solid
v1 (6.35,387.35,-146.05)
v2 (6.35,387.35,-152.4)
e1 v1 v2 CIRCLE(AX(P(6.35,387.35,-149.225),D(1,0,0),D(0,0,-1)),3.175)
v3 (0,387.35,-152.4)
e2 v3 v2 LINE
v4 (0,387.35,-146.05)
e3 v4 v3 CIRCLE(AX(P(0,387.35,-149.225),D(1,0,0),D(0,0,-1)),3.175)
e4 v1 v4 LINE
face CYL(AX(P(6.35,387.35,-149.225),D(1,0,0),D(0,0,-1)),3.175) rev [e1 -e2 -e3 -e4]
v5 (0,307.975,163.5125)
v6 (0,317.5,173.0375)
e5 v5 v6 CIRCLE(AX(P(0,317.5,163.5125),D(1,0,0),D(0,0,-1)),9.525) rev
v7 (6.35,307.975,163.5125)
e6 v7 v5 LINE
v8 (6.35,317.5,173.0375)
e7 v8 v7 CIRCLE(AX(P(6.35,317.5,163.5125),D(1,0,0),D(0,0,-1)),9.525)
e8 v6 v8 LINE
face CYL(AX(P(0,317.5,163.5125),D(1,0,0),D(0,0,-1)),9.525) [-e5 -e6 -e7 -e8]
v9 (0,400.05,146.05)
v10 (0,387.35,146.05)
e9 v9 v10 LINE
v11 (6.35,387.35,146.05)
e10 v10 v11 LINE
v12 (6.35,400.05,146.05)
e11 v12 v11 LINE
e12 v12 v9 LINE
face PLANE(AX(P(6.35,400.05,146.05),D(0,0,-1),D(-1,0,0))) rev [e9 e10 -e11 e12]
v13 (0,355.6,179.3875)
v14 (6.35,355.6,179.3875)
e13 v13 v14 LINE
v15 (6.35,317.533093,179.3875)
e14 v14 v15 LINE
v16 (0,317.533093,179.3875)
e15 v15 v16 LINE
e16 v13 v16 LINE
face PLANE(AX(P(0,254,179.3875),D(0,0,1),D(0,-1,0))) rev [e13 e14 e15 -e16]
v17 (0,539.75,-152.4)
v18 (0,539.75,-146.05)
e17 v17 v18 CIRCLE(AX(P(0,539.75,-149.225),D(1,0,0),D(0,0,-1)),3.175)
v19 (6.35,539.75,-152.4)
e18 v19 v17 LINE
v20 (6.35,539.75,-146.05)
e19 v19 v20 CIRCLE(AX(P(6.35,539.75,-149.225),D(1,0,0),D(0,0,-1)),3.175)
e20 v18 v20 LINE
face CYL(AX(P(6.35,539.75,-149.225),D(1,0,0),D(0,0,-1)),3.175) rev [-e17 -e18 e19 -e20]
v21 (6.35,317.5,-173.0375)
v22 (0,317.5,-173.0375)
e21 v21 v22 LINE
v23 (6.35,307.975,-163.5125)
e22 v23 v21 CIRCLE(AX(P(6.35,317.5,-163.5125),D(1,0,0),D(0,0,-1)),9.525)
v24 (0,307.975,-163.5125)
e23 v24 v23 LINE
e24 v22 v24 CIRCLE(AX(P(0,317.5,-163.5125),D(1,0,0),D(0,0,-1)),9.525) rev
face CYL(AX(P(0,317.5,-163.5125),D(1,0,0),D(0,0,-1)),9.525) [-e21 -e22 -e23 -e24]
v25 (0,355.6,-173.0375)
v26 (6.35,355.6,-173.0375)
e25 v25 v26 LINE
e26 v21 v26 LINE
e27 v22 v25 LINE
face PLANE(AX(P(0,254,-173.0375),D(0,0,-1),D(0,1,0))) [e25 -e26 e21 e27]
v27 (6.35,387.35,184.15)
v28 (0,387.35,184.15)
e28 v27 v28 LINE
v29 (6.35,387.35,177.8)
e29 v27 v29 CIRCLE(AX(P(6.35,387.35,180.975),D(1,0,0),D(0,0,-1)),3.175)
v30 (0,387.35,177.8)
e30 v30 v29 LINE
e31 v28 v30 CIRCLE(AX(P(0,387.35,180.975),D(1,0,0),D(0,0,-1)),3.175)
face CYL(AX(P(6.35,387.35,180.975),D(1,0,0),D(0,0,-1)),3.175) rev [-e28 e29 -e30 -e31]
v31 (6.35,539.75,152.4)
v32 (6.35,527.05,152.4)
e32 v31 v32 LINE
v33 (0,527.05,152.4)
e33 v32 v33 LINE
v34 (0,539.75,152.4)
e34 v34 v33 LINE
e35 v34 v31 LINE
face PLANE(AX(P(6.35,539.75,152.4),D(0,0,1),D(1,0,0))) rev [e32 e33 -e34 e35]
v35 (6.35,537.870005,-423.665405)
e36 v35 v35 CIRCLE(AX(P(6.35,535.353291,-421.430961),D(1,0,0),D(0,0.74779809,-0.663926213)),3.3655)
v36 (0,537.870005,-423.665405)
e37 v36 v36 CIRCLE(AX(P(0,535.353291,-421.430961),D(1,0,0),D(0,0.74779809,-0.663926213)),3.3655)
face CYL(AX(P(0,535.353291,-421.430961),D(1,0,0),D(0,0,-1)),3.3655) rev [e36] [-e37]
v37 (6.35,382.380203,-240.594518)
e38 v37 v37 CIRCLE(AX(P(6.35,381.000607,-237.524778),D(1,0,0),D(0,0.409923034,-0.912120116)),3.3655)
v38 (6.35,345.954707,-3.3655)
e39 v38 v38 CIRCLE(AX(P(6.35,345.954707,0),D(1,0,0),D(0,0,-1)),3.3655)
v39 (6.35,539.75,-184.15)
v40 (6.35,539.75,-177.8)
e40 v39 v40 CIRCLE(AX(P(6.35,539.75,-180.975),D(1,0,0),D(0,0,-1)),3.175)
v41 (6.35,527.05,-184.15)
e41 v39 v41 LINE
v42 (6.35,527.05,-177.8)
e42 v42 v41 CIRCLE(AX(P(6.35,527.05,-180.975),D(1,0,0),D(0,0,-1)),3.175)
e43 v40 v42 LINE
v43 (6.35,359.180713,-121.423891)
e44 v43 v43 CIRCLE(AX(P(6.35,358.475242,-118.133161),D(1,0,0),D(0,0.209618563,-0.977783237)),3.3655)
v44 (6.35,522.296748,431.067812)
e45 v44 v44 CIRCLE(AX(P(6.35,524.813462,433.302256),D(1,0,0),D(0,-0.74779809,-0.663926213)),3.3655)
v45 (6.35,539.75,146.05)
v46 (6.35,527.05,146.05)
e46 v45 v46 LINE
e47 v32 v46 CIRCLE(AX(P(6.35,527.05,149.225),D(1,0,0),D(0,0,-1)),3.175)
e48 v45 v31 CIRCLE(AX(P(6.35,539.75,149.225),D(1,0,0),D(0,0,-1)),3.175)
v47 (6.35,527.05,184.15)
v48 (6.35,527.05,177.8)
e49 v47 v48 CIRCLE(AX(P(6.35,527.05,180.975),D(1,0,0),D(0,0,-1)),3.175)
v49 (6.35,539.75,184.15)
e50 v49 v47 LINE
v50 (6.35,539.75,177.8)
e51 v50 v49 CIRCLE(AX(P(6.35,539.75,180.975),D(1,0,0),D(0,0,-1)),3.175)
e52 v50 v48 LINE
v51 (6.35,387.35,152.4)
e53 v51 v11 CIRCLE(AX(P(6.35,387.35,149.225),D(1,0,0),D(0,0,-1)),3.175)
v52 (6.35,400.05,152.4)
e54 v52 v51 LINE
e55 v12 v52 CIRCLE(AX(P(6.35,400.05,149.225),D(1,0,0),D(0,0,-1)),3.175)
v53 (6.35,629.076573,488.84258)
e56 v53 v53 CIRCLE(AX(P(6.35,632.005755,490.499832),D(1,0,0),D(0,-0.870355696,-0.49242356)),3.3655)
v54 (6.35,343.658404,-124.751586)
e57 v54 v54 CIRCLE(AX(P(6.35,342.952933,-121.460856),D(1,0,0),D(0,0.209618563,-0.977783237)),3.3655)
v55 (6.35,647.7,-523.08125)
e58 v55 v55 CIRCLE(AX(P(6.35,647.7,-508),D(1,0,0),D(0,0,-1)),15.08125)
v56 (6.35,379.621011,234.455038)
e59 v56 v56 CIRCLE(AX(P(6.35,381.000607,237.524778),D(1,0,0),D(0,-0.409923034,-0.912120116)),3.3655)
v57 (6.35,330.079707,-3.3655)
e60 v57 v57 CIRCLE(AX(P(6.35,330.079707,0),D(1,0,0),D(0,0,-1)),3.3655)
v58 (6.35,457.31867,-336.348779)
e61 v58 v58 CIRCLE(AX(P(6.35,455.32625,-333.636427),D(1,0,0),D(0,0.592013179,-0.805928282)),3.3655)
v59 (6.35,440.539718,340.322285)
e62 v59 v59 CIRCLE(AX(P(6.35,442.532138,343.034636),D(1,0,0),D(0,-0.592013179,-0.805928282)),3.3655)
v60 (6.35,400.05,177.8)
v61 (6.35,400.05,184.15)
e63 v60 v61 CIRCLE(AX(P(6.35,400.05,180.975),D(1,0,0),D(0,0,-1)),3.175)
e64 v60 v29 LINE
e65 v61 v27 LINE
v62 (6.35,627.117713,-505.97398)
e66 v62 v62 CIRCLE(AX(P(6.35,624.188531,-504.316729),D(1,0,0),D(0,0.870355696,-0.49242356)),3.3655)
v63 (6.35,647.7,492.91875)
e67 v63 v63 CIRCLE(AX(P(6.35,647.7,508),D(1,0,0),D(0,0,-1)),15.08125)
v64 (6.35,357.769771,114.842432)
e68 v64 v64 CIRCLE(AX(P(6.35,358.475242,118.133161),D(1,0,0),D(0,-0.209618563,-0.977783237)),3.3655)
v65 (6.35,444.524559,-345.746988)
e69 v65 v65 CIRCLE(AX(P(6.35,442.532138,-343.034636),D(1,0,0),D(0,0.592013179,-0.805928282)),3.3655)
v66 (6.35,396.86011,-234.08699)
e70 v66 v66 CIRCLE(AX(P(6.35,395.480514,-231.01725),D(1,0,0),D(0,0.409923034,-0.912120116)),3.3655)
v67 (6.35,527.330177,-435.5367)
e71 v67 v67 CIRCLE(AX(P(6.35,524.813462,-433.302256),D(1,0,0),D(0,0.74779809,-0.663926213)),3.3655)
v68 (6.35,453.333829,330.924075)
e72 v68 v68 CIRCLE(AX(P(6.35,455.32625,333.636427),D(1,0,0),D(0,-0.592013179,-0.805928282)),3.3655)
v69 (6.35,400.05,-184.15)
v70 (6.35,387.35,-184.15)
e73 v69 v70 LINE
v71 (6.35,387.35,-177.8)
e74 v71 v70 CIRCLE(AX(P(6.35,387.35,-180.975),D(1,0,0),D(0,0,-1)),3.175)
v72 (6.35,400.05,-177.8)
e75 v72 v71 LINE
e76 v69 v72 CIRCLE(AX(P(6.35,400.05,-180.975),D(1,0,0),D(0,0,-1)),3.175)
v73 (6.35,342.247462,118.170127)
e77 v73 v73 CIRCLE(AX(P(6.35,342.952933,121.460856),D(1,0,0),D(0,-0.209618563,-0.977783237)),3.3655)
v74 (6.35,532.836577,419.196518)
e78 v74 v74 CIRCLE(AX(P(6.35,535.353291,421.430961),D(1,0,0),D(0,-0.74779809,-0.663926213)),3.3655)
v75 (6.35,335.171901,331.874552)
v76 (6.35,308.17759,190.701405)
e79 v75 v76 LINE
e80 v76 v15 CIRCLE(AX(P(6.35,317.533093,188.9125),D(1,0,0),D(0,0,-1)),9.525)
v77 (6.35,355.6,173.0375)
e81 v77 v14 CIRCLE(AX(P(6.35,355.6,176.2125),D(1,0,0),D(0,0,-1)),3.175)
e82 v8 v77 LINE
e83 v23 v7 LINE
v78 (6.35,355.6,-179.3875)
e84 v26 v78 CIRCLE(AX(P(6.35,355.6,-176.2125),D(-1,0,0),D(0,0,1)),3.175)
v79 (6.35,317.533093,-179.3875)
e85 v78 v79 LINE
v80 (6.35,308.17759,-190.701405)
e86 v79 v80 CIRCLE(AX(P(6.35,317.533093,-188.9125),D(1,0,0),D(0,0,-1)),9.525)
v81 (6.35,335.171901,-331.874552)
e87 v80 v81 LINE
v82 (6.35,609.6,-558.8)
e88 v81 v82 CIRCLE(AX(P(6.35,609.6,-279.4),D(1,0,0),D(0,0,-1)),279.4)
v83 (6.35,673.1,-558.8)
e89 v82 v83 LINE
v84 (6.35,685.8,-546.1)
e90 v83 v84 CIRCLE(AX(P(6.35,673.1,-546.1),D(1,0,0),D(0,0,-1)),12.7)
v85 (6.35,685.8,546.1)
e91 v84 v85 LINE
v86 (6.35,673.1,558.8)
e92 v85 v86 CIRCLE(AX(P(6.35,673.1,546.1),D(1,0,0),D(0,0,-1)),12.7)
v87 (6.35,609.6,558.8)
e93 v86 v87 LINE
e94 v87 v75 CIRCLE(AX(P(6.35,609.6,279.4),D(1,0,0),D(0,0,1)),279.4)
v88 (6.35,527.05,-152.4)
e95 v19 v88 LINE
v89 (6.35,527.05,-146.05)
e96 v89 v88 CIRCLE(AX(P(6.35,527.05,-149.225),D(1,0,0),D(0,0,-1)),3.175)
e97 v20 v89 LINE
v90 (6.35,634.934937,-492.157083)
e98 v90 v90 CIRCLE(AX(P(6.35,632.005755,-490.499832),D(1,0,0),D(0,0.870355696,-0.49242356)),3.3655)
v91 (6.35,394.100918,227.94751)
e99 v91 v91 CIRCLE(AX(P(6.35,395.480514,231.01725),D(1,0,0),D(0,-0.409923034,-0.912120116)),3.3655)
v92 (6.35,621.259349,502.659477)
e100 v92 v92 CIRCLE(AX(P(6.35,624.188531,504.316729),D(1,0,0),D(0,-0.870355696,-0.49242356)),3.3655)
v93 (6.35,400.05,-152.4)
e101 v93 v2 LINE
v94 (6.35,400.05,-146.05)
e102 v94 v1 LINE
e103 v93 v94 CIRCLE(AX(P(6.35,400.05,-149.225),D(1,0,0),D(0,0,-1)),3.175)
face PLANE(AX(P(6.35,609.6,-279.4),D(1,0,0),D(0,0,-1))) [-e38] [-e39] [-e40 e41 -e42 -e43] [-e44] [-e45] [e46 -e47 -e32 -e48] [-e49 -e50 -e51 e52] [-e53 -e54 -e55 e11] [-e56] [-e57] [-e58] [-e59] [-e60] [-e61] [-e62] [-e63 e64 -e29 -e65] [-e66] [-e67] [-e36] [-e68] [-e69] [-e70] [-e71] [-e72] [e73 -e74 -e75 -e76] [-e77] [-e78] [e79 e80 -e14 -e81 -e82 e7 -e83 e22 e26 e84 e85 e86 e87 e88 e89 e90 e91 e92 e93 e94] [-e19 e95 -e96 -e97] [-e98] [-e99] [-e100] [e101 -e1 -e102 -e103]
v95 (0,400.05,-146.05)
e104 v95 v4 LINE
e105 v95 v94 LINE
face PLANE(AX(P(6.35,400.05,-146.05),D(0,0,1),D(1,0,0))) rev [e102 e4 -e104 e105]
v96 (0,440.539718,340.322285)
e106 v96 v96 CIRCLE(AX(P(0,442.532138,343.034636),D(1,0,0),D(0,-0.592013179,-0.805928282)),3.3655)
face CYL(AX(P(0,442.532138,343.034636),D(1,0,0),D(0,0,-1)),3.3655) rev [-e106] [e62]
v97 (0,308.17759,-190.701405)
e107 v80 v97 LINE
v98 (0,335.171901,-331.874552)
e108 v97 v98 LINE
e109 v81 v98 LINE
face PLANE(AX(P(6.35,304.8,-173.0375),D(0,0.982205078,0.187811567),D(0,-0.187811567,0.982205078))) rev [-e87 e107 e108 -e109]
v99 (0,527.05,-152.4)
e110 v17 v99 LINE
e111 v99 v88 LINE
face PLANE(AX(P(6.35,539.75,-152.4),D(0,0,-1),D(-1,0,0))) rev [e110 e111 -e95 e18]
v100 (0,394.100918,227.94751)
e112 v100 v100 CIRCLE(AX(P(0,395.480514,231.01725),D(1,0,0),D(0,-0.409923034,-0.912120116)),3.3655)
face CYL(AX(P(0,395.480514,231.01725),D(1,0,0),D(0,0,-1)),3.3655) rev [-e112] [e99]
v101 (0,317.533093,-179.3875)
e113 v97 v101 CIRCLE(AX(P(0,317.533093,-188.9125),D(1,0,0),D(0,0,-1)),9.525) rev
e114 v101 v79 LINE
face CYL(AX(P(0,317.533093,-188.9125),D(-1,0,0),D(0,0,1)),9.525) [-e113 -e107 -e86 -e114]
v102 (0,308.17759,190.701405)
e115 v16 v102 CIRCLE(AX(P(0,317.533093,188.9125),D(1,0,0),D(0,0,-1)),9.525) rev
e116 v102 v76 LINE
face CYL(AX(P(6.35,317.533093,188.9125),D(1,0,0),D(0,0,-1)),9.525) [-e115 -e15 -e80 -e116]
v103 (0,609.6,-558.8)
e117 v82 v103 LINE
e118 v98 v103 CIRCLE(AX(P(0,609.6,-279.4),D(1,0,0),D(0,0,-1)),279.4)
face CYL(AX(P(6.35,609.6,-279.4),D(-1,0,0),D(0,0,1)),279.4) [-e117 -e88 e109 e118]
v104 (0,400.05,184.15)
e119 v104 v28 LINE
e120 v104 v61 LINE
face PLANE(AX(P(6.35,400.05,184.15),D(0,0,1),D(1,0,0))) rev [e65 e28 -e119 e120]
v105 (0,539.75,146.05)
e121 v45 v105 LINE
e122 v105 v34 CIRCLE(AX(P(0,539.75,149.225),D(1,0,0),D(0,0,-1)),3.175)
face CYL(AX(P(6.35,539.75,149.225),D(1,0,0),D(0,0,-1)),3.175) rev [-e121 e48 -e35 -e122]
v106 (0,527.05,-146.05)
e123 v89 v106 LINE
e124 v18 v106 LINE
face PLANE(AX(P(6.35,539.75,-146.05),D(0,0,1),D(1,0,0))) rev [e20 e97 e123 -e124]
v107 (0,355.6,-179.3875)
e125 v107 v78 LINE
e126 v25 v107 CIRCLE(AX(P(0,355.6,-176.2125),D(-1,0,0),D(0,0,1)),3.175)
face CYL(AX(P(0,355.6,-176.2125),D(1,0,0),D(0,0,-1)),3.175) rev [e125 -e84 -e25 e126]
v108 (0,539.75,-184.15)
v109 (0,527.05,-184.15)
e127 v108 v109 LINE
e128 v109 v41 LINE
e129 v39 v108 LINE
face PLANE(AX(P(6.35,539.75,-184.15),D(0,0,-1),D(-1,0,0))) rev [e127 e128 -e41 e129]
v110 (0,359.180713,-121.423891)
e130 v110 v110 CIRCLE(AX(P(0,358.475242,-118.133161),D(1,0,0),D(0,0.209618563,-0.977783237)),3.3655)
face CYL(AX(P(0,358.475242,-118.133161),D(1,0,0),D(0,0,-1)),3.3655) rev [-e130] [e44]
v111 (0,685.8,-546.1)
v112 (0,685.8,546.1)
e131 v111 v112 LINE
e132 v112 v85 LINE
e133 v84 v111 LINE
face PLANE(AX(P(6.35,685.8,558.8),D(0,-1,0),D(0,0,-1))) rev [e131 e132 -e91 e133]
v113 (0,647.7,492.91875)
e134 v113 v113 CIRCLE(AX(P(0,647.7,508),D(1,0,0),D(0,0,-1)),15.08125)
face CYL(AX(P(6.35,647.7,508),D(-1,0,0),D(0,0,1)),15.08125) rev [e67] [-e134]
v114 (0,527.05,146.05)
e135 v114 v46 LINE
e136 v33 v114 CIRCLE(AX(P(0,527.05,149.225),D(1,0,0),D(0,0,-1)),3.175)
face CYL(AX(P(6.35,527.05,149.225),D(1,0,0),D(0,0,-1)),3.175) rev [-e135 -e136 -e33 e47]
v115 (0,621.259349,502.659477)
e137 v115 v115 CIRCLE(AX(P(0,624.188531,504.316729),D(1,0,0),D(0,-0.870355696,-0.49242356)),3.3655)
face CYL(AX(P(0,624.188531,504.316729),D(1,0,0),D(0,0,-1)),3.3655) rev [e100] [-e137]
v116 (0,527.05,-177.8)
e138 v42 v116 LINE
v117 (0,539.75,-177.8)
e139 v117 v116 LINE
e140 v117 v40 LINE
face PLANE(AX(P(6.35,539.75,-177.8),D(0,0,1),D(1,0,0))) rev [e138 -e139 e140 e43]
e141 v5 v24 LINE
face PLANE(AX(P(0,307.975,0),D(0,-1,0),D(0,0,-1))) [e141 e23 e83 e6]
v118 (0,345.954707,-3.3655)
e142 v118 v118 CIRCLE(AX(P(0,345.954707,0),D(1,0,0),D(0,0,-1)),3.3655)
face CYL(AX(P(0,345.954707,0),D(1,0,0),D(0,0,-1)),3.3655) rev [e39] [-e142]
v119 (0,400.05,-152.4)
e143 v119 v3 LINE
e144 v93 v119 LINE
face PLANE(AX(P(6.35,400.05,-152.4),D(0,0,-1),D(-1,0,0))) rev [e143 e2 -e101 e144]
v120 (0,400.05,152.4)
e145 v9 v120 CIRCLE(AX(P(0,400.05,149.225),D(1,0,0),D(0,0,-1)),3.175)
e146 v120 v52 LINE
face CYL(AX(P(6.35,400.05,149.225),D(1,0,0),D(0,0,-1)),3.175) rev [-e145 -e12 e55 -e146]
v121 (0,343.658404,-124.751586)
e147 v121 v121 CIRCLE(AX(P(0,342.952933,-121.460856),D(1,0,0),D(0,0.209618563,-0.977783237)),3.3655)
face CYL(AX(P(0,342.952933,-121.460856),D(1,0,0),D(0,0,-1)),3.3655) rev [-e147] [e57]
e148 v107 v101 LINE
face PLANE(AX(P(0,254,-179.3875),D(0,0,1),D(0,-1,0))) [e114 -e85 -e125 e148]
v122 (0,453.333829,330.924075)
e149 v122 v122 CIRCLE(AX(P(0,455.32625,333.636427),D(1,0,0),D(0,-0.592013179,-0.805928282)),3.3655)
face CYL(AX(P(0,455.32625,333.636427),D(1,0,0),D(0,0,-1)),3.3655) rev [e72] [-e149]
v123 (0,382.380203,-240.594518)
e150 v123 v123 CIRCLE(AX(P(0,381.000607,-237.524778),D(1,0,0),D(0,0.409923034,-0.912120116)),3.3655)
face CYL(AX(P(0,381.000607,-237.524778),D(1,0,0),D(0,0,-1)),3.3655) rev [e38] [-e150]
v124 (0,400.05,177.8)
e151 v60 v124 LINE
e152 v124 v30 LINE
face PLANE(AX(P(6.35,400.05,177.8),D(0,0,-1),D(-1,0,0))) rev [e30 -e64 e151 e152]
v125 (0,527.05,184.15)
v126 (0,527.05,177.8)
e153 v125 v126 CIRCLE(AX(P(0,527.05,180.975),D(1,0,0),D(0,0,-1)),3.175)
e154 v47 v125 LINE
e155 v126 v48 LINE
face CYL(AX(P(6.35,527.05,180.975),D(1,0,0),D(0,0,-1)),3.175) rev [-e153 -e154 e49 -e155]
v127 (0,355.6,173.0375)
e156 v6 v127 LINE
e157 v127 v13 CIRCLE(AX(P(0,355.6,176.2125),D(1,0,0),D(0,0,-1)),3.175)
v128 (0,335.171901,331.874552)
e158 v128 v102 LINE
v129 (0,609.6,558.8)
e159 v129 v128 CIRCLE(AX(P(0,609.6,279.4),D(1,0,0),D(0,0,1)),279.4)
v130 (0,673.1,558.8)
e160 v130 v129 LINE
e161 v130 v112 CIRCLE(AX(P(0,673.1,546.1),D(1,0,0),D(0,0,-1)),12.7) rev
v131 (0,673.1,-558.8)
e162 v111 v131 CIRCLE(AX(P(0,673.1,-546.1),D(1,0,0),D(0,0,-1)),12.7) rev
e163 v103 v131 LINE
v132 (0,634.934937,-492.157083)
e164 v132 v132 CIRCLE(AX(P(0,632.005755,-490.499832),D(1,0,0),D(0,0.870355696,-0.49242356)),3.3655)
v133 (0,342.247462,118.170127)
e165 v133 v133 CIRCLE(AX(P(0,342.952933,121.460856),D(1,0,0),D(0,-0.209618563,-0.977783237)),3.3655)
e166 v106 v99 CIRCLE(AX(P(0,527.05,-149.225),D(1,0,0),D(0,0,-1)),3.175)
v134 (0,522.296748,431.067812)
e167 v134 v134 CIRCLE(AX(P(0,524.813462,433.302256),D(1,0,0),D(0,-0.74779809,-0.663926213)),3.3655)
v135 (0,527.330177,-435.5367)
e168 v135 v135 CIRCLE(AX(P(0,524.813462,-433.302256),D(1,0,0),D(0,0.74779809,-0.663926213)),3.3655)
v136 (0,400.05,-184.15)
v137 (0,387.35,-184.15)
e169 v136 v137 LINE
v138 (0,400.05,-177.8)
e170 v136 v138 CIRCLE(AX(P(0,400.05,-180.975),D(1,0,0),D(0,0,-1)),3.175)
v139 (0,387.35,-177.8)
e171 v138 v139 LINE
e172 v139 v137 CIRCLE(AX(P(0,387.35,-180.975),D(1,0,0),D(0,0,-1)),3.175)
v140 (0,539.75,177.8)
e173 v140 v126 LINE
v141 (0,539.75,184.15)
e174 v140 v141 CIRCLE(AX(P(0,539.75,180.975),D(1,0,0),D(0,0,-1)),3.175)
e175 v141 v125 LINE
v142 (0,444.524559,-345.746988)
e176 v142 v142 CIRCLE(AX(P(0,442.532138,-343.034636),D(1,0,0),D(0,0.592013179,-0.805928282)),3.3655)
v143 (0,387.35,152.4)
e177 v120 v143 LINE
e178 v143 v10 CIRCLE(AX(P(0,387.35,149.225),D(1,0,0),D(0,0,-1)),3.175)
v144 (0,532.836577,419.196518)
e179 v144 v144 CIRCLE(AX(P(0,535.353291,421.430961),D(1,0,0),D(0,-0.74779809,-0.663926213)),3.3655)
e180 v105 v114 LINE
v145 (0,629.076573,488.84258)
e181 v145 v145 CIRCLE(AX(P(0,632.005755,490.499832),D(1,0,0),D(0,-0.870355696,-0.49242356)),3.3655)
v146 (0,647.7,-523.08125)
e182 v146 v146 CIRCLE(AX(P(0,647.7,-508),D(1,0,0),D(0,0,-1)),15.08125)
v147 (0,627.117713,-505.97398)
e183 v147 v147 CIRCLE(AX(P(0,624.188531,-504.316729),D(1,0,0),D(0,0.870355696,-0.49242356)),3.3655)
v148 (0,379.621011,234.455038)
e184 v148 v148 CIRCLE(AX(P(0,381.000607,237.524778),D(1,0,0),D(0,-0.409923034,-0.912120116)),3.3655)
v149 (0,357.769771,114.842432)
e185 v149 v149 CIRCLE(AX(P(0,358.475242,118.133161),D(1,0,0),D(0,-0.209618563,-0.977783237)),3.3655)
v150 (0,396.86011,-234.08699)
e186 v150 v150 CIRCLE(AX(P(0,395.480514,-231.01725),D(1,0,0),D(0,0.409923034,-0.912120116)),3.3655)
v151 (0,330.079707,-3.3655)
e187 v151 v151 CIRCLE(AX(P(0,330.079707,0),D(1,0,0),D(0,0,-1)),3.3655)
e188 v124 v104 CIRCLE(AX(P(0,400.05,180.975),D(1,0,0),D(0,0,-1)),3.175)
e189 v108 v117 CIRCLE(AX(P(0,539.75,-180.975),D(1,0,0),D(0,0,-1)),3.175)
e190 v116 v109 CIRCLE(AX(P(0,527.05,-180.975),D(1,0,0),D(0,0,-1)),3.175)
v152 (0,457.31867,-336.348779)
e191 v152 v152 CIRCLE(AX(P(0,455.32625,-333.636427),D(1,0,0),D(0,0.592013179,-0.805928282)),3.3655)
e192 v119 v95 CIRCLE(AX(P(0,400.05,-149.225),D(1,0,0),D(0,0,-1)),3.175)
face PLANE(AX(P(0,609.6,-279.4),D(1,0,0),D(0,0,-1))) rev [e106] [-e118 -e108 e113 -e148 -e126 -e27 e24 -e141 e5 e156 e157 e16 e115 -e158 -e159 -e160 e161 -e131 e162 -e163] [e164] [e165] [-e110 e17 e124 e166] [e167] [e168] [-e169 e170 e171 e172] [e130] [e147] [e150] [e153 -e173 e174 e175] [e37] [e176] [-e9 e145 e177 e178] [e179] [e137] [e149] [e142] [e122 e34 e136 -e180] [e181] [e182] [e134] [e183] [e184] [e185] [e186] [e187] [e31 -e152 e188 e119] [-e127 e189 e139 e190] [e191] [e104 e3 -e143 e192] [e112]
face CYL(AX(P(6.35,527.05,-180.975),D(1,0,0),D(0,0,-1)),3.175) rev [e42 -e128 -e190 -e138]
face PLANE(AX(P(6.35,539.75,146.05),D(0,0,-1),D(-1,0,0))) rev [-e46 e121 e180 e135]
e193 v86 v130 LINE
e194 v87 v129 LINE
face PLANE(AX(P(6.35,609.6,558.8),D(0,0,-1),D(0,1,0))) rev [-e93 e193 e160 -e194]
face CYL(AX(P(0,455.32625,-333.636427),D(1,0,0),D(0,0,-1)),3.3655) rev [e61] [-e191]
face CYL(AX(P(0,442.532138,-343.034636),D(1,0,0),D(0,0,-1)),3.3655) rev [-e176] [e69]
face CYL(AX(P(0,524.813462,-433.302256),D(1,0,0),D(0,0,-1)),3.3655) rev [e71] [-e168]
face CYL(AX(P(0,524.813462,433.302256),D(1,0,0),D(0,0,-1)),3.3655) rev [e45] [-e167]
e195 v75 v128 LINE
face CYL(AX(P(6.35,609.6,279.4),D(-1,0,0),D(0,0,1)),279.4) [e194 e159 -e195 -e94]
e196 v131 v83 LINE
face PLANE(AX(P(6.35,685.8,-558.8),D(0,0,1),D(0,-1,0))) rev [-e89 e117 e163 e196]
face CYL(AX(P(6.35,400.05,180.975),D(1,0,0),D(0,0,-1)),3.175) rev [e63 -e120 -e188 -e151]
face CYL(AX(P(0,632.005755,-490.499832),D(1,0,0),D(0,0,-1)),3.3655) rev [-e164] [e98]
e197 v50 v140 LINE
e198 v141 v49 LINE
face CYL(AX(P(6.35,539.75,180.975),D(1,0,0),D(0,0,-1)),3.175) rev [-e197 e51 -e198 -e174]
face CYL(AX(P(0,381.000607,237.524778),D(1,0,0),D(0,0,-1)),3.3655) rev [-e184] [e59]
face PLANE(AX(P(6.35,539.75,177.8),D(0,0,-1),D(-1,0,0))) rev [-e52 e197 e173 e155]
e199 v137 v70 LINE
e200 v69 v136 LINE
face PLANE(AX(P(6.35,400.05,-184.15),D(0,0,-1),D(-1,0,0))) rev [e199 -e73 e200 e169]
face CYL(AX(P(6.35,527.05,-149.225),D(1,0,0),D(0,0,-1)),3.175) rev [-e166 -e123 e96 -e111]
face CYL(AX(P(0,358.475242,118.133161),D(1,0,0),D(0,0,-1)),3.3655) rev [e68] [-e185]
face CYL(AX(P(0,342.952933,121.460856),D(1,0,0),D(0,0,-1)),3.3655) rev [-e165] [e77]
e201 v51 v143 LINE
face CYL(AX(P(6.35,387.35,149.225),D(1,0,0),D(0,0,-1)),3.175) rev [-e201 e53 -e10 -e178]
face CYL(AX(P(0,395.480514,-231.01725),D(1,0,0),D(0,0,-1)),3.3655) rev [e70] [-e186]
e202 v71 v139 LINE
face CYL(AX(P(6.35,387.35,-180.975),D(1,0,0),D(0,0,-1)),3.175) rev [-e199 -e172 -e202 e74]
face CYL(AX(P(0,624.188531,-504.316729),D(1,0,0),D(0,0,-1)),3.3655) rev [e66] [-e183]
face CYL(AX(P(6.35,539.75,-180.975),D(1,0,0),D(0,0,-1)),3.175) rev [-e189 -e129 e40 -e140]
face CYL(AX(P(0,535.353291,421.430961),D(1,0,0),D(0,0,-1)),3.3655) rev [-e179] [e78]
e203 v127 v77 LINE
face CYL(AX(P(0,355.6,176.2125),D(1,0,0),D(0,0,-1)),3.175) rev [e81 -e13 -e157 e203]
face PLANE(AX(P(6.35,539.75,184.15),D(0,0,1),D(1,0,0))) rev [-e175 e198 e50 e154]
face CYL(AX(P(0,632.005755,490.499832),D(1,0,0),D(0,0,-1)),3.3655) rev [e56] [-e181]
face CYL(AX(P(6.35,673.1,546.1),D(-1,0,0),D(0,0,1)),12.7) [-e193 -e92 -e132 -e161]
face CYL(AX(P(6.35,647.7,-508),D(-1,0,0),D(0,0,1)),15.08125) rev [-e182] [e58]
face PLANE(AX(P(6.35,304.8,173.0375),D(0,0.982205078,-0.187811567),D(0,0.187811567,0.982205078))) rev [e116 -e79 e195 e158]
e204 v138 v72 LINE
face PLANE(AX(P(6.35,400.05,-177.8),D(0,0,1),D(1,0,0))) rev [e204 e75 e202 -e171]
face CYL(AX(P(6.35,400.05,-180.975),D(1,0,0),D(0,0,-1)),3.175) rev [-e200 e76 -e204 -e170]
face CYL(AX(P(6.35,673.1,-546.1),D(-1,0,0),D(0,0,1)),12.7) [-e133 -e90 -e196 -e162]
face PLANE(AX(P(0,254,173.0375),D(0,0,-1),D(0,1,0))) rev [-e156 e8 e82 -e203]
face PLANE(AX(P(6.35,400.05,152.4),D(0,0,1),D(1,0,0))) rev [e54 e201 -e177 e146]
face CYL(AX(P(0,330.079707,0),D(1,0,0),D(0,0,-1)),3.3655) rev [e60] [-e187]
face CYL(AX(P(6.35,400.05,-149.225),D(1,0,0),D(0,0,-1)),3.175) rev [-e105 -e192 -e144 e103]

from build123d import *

# Parameters (mm, degrees)
SKETCH1_R                       = 15.08125
BOSS_EXTRUDE1_DEPTH             = 6.35
SKETCH4_R                       = 3.3655
CUT_EXTRUDE1_DEPTH              = 885.657788357
CIRPATTERN1_COUNT               = 6
CIRPATTERN1_ANGLE               = 60.5
CIRPATTERN1_THE_OTHER_WAY_COUNT = 6
CIRPATTERN1_THE_OTHER_WAY_ANGLE = 60.5
F_1_4_0_25_DIAMETER_SLOT1_DEPTH = 6.35
CUT_EXTRUDE2_DEPTH              = 885.657788357
FILLET2_R                       = 9.525
FILLET3_R                       = 12.7
SKETCH9_W                       = 6.35
SKETCH9_H                       = 346.075
CUT_EXTRUDE3_DEPTH              = 3.175
FILLET4_R                       = 9.525


# Read off the part's stored shape, not the designer's step: 1/4 (0.25) Diameter Slot1
with BuildPart() as part:
    # Sketch1 → Boss-Extrude1 (new body)
    with BuildSketch(Plane(origin=(0, 0, 0), x_dir=(0, 0, -1), z_dir=(1, 0, 0))):
        with BuildLine():
            Line((-558.8, 609.6), (-558.8, 685.8))
            Line((-558.8, 685.8), (558.8, 685.8))
            Line((558.8, 685.8), (558.8, 609.6))
            ThreePointArc((558.8, 609.6), (494.720400534, 431.550891286), (331.874551798, 335.171901195))
            Line((331.874551798, 335.171901195), (173.0375, 304.8))
            Line((173.0375, 304.8), (-173.0375, 304.8))
            Line((-173.0375, 304.8), (-331.874551798, 335.171901195))
            ThreePointArc((-331.874551798, 335.171901195), (-494.720400534, 431.550891286), (-558.8, 609.6))
        make_face()
        with Locations((-508, 647.7)):
            Circle(SKETCH1_R, mode=Mode.SUBTRACT)
        with Locations((508, 647.7)):
            Circle(SKETCH1_R, mode=Mode.SUBTRACT)
    extrude(amount=BOSS_EXTRUDE1_DEPTH)

    # Sketch4 → Cut-Extrude1 (cut, through all)
    with BuildSketch(Plane(origin=(6.35, 0, 0), x_dir=(0, 0, -1), z_dir=(1, 0, 0))):
        with Locations((0, 345.954707227)):
            Circle(SKETCH4_R)
        with Locations((0, 330.079707227)):
            Circle(SKETCH4_R)
    cut_extrude1 = extrude(amount=-CUT_EXTRUDE1_DEPTH, mode=Mode.SUBTRACT)

    # CirPattern1: Cut-Extrude1 ×6 about axis
    cirpattern1_axis = Axis((0, 909.517207227, 0), (1, 0, 0))
    for i in range(1, CIRPATTERN1_COUNT):
        add(cut_extrude1.rotate(cirpattern1_axis, i * CIRPATTERN1_ANGLE / (CIRPATTERN1_COUNT - 1)), mode=Mode.SUBTRACT)

    # CirPattern1 the other way: Cut-Extrude1 ×6 about axis
    cirpattern1_the_other_way_axis = Axis((0, 909.517207227, 0), (-1, 0, 0))
    for i in range(1, CIRPATTERN1_THE_OTHER_WAY_COUNT):
        add(cut_extrude1.rotate(cirpattern1_the_other_way_axis, i * CIRPATTERN1_THE_OTHER_WAY_ANGLE / (CIRPATTERN1_THE_OTHER_WAY_COUNT - 1)), mode=Mode.SUBTRACT)

    # 1/4 (0.25) Diameter Slot1 outline → 1/4 (0.25) Diameter Slot1 (cut)
    with BuildSketch(Plane.YZ):
        with BuildLine():
            Line((539.75, 152.4), (527.05, 152.4))
            ThreePointArc((527.05, 152.4), (523.875, 149.225), (527.05, 146.05))
            Line((527.05, 146.05), (539.75, 146.05))
            ThreePointArc((539.75, 146.05), (542.925, 149.225), (539.75, 152.4))
        make_face()
        with BuildLine():
            ThreePointArc((387.35, 152.4), (384.175, 149.225), (387.35, 146.05))
            Line((387.35, 146.05), (400.05, 146.05))
            ThreePointArc((400.05, 146.05), (403.225, 149.225), (400.05, 152.4))
            Line((400.05, 152.4), (387.35, 152.4))
        make_face()
        with BuildLine():
            Line((539.75, 184.15), (527.05, 184.15))
            ThreePointArc((527.05, 184.15), (523.875, 180.975), (527.05, 177.8))
            Line((527.05, 177.8), (539.75, 177.8))
            ThreePointArc((539.75, 177.8), (542.925, 180.975), (539.75, 184.15))
        make_face()
        with BuildLine():
            ThreePointArc((387.35, 184.15), (384.175, 180.975), (387.35, 177.8))
            Line((387.35, 177.8), (400.05, 177.8))
            ThreePointArc((400.05, 177.8), (403.225, 180.975), (400.05, 184.15))
            Line((400.05, 184.15), (387.35, 184.15))
        make_face()
    f_1_4_0_25_diameter_slot1 = extrude(amount=F_1_4_0_25_DIAMETER_SLOT1_DEPTH, mode=Mode.SUBTRACT)

    # Mirror1: 1/4 (0.25) Diameter Slot1 across plane
    add(f_1_4_0_25_diameter_slot1.mirror(Plane.XY), mode=Mode.SUBTRACT)

    # Sketch7 → Cut-Extrude2 (cut, through all)
    with BuildSketch(Plane(origin=(6.35, 0, 0), x_dir=(0, 0, -1), z_dir=(1, 0, 0))):
        with BuildLine():
            Line((-179.3875, 254), (-179.3875, 355.6))
            ThreePointArc((-179.3875, 355.6), (-176.2125, 358.775), (-173.0375, 355.6))
            Line((-173.0375, 355.6), (-173.0375, 254))
            ThreePointArc((-173.0375, 254), (-176.2125, 250.825), (-179.3875, 254))
        make_face()
    cut_extrude2 = extrude(amount=-CUT_EXTRUDE2_DEPTH, mode=Mode.SUBTRACT)

    # Mirror5: Cut-Extrude2 across plane
    add(cut_extrude2.mirror(Plane.XY), mode=Mode.SUBTRACT)

    # Fillet2
    fillet2_edges = [part.edges().sort_by_distance(p)[0] for p in [
        (3.175, 306.014210226, 179.3875),
        (3.175, 306.014210226, -179.3875),
    ]]
    fillet(fillet2_edges, radius=FILLET2_R)

    # Fillet3
    fillet3_edges = [part.edges().sort_by_distance(p)[0] for p in [
        (3.175, 685.8, 558.8),
        (3.175, 685.8, -558.8),
    ]]
    fillet(fillet3_edges, radius=FILLET3_R)

    # Sketch9 → Cut-Extrude3 (cut)
    with BuildSketch(Plane.XZ.offset(-304.8)):
        with Locations((3.175, 0)):
            Rectangle(SKETCH9_W, SKETCH9_H)
    extrude(amount=-CUT_EXTRUDE3_DEPTH, mode=Mode.SUBTRACT)

    # Fillet4
    fillet4_edges = [part.edges().sort_by_distance(p)[0] for p in [
        (3.175, 307.975, 173.0375),
        (3.175, 307.975, -173.0375),
    ]]
    fillet(fillet4_edges, radius=FILLET4_R)


solid = part.part
